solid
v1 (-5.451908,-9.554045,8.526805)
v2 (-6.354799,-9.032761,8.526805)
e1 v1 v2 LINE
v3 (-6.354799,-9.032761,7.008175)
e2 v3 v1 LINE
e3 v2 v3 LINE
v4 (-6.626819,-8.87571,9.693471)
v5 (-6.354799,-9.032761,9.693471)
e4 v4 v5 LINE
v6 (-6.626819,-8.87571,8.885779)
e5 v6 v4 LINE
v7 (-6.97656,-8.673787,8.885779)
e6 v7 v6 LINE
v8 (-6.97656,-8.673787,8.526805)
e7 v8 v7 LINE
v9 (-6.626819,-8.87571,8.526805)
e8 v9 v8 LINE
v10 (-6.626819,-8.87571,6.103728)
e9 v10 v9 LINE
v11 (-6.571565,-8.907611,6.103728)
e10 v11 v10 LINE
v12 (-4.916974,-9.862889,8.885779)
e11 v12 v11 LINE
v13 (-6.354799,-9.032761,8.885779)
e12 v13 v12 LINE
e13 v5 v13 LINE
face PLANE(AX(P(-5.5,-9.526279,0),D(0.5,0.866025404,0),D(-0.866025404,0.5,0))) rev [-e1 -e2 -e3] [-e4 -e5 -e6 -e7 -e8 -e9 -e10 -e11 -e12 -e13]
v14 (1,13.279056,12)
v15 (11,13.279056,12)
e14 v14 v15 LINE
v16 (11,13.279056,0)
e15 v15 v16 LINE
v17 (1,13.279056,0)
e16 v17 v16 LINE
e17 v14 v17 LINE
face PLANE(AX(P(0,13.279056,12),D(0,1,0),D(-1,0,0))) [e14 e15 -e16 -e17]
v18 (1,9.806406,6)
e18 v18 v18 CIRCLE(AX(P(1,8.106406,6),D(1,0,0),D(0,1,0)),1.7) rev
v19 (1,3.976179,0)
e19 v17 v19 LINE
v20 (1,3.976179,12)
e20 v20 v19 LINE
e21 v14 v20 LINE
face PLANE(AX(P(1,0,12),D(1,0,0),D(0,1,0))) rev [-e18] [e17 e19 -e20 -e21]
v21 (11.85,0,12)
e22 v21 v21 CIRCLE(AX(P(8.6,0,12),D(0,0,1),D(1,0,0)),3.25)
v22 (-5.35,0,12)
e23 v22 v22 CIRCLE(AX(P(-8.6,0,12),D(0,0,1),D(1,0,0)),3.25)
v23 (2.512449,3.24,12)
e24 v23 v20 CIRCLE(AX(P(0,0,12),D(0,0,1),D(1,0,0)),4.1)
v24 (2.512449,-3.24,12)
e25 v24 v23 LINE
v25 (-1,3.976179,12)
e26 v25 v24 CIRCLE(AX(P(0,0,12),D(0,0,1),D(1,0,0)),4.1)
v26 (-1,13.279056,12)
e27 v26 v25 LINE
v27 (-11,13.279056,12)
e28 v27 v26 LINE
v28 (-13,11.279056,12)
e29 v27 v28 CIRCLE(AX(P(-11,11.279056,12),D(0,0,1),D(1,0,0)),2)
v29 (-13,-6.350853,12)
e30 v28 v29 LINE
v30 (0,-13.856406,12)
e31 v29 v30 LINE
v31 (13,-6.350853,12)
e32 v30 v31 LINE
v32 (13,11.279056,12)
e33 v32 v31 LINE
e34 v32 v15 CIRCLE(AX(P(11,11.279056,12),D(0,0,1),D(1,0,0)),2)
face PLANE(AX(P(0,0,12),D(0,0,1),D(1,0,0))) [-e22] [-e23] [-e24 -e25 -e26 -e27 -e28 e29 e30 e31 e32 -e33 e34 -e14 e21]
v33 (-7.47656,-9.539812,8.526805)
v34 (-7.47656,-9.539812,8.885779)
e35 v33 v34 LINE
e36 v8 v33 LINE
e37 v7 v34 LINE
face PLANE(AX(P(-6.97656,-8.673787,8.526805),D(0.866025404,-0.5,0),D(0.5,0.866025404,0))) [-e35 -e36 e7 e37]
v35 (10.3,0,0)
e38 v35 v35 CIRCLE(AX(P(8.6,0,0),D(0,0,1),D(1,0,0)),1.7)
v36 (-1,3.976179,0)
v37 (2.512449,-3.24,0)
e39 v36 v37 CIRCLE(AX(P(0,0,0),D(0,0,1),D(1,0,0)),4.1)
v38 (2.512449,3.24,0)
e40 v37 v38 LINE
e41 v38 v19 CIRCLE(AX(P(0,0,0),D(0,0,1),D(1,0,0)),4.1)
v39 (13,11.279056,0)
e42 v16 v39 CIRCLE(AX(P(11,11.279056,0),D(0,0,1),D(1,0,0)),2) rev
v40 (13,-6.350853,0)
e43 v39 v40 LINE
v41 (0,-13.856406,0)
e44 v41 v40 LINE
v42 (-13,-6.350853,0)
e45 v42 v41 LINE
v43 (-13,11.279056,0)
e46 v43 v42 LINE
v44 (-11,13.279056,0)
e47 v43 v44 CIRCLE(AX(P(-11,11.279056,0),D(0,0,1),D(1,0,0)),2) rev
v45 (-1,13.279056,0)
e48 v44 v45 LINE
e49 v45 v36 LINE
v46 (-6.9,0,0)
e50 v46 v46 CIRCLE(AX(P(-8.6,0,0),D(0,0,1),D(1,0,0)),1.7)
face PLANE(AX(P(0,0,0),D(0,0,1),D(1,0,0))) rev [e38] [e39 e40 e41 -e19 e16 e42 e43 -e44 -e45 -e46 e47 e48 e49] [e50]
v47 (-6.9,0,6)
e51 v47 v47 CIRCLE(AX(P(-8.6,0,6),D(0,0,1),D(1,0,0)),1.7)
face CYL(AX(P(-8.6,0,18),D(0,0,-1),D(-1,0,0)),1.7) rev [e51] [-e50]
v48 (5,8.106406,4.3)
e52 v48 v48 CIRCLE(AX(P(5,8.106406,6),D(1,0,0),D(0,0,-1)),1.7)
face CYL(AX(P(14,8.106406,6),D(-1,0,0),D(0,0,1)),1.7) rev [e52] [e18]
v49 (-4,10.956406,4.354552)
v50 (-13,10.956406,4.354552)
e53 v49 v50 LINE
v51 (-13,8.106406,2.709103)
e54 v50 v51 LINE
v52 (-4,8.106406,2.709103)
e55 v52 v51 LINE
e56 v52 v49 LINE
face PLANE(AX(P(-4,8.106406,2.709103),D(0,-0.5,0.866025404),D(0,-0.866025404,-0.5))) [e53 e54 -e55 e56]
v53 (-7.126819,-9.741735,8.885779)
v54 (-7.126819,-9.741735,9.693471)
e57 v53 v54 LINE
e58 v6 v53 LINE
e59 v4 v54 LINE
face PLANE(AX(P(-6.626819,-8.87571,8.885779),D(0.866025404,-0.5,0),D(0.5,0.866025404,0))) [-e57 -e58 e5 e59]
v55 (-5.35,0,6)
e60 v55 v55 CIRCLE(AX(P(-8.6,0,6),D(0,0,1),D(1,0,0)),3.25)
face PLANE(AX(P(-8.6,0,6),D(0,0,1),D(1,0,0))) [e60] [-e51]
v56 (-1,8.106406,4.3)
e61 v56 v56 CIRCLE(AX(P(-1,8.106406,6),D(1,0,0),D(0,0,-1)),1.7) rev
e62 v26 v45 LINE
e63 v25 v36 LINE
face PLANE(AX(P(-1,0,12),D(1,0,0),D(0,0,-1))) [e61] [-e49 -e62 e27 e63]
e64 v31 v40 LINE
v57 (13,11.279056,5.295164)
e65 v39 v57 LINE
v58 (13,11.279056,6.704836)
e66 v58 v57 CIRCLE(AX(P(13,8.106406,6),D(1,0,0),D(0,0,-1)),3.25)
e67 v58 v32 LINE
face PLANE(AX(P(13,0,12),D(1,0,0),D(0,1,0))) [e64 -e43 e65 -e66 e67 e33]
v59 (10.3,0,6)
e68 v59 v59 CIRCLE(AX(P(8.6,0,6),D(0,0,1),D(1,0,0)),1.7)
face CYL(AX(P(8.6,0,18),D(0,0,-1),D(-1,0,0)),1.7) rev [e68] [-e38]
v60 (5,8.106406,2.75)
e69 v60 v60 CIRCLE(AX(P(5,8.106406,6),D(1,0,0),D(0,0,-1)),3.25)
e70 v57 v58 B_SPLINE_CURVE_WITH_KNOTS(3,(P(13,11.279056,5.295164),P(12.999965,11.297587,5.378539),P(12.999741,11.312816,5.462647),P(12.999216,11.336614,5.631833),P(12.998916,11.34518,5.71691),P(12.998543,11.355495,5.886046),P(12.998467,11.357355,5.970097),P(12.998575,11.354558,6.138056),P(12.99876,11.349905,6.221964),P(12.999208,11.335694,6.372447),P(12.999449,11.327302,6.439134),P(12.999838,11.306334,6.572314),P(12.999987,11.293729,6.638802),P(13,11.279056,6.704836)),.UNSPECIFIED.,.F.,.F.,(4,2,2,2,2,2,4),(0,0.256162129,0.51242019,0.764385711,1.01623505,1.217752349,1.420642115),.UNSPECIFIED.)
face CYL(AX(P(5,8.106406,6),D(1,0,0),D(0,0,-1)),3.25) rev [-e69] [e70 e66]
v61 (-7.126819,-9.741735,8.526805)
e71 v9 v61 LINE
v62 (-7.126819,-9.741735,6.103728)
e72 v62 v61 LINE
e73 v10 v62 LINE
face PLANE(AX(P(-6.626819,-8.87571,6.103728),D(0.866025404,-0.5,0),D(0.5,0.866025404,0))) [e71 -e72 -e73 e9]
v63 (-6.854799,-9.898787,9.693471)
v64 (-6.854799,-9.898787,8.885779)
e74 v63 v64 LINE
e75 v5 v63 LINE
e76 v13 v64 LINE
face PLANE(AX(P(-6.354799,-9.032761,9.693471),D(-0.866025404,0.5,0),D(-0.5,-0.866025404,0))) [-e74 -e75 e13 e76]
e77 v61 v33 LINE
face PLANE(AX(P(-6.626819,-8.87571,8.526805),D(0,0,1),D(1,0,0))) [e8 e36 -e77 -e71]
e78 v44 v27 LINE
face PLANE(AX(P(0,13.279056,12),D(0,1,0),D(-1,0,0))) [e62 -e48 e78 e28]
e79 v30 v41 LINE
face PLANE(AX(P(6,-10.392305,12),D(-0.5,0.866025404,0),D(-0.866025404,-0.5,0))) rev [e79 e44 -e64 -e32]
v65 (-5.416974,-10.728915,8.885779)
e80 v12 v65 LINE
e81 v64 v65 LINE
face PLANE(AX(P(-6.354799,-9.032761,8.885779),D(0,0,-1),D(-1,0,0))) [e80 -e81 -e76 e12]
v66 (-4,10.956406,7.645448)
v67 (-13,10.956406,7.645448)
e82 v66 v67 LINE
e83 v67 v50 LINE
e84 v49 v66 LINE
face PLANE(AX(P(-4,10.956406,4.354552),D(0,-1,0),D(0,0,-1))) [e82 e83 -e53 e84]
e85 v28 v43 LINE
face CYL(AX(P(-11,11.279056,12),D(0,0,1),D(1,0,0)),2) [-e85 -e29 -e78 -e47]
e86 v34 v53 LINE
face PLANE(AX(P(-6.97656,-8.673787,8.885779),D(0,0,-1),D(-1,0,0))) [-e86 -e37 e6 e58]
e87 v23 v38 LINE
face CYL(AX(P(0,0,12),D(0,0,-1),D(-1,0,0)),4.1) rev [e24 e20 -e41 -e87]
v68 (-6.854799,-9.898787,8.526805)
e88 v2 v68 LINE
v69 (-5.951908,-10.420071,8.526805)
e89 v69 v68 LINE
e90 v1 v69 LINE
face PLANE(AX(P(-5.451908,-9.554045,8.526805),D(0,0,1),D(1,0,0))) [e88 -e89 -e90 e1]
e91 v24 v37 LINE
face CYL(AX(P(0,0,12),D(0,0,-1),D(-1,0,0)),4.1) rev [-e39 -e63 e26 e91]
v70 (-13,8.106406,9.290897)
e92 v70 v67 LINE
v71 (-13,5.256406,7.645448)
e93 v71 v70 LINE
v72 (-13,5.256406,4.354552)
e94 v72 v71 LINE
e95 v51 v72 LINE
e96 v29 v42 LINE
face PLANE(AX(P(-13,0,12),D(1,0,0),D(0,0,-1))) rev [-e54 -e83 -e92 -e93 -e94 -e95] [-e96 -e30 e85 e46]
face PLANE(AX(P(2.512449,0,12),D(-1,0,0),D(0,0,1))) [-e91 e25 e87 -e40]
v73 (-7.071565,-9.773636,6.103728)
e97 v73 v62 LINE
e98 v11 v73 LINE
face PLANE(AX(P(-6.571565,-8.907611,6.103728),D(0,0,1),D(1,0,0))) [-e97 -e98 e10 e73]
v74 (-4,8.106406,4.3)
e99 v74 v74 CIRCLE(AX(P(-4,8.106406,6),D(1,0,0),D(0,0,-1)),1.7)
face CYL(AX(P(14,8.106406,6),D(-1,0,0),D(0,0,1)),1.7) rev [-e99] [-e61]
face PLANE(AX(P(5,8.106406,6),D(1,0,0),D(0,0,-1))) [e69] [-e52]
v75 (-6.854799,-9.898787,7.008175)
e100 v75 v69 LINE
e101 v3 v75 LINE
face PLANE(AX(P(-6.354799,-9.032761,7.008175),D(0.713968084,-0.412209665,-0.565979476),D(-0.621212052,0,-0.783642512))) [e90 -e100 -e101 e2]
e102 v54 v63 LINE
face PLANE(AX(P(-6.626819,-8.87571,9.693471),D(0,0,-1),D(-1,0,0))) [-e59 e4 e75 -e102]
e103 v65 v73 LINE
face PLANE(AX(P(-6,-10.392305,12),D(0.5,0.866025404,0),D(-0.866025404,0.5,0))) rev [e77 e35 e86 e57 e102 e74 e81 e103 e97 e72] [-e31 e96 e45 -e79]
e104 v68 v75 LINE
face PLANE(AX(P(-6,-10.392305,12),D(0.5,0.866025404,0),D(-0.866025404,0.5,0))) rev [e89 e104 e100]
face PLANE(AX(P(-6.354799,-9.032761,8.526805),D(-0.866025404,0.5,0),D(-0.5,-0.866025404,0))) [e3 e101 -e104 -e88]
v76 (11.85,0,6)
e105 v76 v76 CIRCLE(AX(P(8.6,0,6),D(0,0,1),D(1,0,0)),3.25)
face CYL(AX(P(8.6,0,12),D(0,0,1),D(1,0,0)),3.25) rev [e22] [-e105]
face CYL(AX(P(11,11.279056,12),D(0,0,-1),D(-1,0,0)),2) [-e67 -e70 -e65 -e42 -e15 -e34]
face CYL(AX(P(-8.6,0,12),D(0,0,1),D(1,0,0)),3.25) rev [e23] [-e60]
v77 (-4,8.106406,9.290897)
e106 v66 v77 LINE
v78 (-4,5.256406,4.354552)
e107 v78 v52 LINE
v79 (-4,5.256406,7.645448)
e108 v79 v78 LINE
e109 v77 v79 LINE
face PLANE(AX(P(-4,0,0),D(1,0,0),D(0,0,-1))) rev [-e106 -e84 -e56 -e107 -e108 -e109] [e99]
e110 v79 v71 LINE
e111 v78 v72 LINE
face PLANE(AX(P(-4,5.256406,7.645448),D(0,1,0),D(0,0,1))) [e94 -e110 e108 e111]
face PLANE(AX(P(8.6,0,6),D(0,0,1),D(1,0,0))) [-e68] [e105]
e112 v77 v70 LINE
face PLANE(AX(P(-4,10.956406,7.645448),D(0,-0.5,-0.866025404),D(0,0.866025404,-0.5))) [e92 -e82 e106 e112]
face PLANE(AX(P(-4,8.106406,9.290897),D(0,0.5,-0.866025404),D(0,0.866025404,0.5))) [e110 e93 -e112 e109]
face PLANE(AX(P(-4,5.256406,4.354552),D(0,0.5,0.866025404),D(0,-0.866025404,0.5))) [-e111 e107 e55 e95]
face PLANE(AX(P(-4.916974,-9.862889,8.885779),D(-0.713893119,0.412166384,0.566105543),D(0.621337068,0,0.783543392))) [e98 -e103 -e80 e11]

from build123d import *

# Parameters (mm, degrees)
BOSS_EXTRUDE1_DEPTH            = 12
SKETCH41_R                     = 1.7
CUT_EXTRUDE7_DEPTH             = 18
CBORE_FOR_M3_SHCS1_D           = 3.4
CBORE_FOR_M3_SHCS1_CBORE_D     = 6.5
CBORE_FOR_M3_SHCS1_CBORE_DEPTH = 3
F_3DSKETCH3_START              = 9
F_3DSKETCH3_OUTLINE_R          = 3.25
F_3DSKETCH3_OUTLINE_R_2        = 1.7
F_3DSKETCH3_DEPTH              = 3
CUT_EXTRUDE10_DEPTH            = 15
CUT_EXTRUDE10_DEPTH_BACK       = 15
SKETCH52_R                     = 1.7
SKETCH58_R                     = 3.25
CUT_EXTRUDE11_DEPTH            = 8
CUT_EXTRUDE12_DEPTH            = 4
CUT_EXTRUDE12_DEPTH_BACK       = 6
FILLET1_R                      = 2
SKETCH61_R                     = 3.25
CUT_EXTRUDE13_DEPTH            = 6
CUT_EXTRUDE14_DEPTH            = 1


# Read off the part's stored shape, not the designer's step: 3DSketch3
with BuildPart() as part:
    # Sketch1 → Boss-Extrude1 (new body)
    with BuildSketch(Plane(origin=(0, 0, 0), x_dir=(0, 1, 0), z_dir=(0, 0, 1))):
        with BuildLine():
            Line((-6.350852961, -13), (13.279056191, -13))
            Line((13.279056191, -13), (13.279056191, -1))
            Line((13.279056191, -1), (3.97617907, -1))
            ThreePointArc((3.97617907, -1), (3.68648689, -1.794384131), (3.24, -2.512449004))
            Line((3.24, -2.512449004), (-3.24, -2.512449004))
            ThreePointArc((-3.24, -2.512449004), (-3.879046275, -1.327780102), (-4.1, 0))
            ThreePointArc((-4.1, 0), (-0.503818326, 4.06892702), (3.97617907, 1))
            Line((3.97617907, 1), (13.279056191, 1))
            Line((13.279056191, 1), (13.279056191, 13))
            Line((13.279056191, 13), (-6.350852961, 13))
            Line((-6.350852961, 13), (-13.856406461, 0))
            Line((-13.856406461, 0), (-6.350852961, -13))
        make_face()
    extrude(amount=BOSS_EXTRUDE1_DEPTH)

    # Sketch41 → Cut-Extrude7 (cut)
    with BuildSketch(Plane(origin=(0, 0, 0), x_dir=(0, 1, 0), z_dir=(0, 0, 1))):
        with Locations(Location((0, 8.6, 0), (0, 0, 270))):
            Circle(SKETCH41_R)
        with Locations(Location((0, -8.6, 0), (0, 0, 270))):
            Circle(SKETCH41_R)
    extrude(amount=CUT_EXTRUDE7_DEPTH, mode=Mode.SUBTRACT)

    # CBORE for M3 SHCS1 (through all)
    with Locations(Plane(origin=(-8.6, 0, 12), x_dir=(1, 0, 0), z_dir=(0, 0, 1))):
        with Locations((0, 0)):
            CounterBoreHole(CBORE_FOR_M3_SHCS1_D / 2, CBORE_FOR_M3_SHCS1_CBORE_D / 2, CBORE_FOR_M3_SHCS1_CBORE_DEPTH)

    # 3DSketch3 outline → 3DSketch3 (cut)
    with BuildSketch(Plane.XY.offset(F_3DSKETCH3_START)):
        with Locations((8.6, 0)):
            Circle(F_3DSKETCH3_OUTLINE_R)
        with Locations((8.6, 0)):
            Circle(F_3DSKETCH3_OUTLINE_R_2, mode=Mode.SUBTRACT)
    extrude(amount=F_3DSKETCH3_DEPTH, mode=Mode.SUBTRACT)

    # Sketch52 → Cut-Extrude10 (cut, two sides: drawn at the far end of the back side and taken through both)
    with BuildSketch(Plane.YZ.offset(-1).offset(-CUT_EXTRUDE10_DEPTH_BACK)):
        with Locations((8.106406461, 6)):
            Circle(SKETCH52_R)
    extrude(amount=CUT_EXTRUDE10_DEPTH + CUT_EXTRUDE10_DEPTH_BACK, mode=Mode.SUBTRACT)

    # Sketch58 → Cut-Extrude11 (cut)
    with BuildSketch(Plane.YZ.offset(13)):
        with Locations(Location((8.106406461, 6, 0), (0, 0, 270))):
            Circle(SKETCH58_R)
    extrude(amount=-CUT_EXTRUDE11_DEPTH, mode=Mode.SUBTRACT)

    # Sketch60 → Cut-Extrude12 (cut, two sides: drawn at the far end of the back side and taken through both)
    with BuildSketch(Plane.YZ.offset(-8).offset(-CUT_EXTRUDE12_DEPTH_BACK)):
        Polygon((8.106406461, 2.709103466), (10.956406461, 4.354551733), (10.956406461, 7.645448267), (8.106406461, 9.290896534), (5.256406461, 7.645448267), (5.256406461, 4.354551733), align=None)
    extrude(amount=CUT_EXTRUDE12_DEPTH + CUT_EXTRUDE12_DEPTH_BACK, mode=Mode.SUBTRACT)

    # Fillet1
    # the kernel refuses this fillet: 2 mm, written as the material it takes off along each edge
    with BuildSketch(Plane(origin=(13, 13.279056191, -5), x_dir=(0, -1, 0), z_dir=(0, 0, 1)), Plane(origin=(-13, 13.279056191, -5), x_dir=(1, 0, 0), z_dir=(0, 0, 1))) as fillet1_piece_1:
        with BuildLine():
            CenterArc((FILLET1_R, -FILLET1_R), FILLET1_R, 90, 90)
            Line((0, -FILLET1_R), (0, 0))
            Line((0, 0), (FILLET1_R, 0))
        make_face()
    extrude(amount=22, mode=Mode.SUBTRACT)

    # Sketch61 → Cut-Extrude13 (cut)
    with BuildSketch(Plane(origin=(0, 0, 12), x_dir=(0, 1, 0), z_dir=(0, 0, 1))):
        with Locations(Location((0, 8.6, 0), (0, 0, 270))):
            Circle(SKETCH61_R)
        with Locations(Location((0, -8.6, 0), (0, 0, 270))):
            Circle(SKETCH61_R)
    extrude(amount=-CUT_EXTRUDE13_DEPTH, mode=Mode.SUBTRACT)

    # Sketch62 → Cut-Extrude14 (cut)
    with BuildSketch(Plane(origin=(-6, -10.392304845, 0), x_dir=(-0.8660254037844386, 0.5000000000000001, 0), z_dir=(-0.5000000000000001, -0.8660254037844386, 0))):
        Polygon((1.237336886, -6.103727624), (1.301138969, -6.103727624), (1.301138969, -8.526804547), (1.704985123, -8.526804547), (1.704985123, -8.885778906), (1.301138969, -8.885778906), (1.301138969, -9.693471213), (0.987036405, -9.693471213), (0.987036405, -8.885778906), (-0.673220005, -8.885778906), align=None)
        Polygon((0.987036405, -8.526804547), (0.987036405, -7.008174739), (-0.055531704, -8.526804547), align=None, mode=Mode.SUBTRACT)
    extrude(amount=-CUT_EXTRUDE14_DEPTH, mode=Mode.SUBTRACT)


solid = part.part
